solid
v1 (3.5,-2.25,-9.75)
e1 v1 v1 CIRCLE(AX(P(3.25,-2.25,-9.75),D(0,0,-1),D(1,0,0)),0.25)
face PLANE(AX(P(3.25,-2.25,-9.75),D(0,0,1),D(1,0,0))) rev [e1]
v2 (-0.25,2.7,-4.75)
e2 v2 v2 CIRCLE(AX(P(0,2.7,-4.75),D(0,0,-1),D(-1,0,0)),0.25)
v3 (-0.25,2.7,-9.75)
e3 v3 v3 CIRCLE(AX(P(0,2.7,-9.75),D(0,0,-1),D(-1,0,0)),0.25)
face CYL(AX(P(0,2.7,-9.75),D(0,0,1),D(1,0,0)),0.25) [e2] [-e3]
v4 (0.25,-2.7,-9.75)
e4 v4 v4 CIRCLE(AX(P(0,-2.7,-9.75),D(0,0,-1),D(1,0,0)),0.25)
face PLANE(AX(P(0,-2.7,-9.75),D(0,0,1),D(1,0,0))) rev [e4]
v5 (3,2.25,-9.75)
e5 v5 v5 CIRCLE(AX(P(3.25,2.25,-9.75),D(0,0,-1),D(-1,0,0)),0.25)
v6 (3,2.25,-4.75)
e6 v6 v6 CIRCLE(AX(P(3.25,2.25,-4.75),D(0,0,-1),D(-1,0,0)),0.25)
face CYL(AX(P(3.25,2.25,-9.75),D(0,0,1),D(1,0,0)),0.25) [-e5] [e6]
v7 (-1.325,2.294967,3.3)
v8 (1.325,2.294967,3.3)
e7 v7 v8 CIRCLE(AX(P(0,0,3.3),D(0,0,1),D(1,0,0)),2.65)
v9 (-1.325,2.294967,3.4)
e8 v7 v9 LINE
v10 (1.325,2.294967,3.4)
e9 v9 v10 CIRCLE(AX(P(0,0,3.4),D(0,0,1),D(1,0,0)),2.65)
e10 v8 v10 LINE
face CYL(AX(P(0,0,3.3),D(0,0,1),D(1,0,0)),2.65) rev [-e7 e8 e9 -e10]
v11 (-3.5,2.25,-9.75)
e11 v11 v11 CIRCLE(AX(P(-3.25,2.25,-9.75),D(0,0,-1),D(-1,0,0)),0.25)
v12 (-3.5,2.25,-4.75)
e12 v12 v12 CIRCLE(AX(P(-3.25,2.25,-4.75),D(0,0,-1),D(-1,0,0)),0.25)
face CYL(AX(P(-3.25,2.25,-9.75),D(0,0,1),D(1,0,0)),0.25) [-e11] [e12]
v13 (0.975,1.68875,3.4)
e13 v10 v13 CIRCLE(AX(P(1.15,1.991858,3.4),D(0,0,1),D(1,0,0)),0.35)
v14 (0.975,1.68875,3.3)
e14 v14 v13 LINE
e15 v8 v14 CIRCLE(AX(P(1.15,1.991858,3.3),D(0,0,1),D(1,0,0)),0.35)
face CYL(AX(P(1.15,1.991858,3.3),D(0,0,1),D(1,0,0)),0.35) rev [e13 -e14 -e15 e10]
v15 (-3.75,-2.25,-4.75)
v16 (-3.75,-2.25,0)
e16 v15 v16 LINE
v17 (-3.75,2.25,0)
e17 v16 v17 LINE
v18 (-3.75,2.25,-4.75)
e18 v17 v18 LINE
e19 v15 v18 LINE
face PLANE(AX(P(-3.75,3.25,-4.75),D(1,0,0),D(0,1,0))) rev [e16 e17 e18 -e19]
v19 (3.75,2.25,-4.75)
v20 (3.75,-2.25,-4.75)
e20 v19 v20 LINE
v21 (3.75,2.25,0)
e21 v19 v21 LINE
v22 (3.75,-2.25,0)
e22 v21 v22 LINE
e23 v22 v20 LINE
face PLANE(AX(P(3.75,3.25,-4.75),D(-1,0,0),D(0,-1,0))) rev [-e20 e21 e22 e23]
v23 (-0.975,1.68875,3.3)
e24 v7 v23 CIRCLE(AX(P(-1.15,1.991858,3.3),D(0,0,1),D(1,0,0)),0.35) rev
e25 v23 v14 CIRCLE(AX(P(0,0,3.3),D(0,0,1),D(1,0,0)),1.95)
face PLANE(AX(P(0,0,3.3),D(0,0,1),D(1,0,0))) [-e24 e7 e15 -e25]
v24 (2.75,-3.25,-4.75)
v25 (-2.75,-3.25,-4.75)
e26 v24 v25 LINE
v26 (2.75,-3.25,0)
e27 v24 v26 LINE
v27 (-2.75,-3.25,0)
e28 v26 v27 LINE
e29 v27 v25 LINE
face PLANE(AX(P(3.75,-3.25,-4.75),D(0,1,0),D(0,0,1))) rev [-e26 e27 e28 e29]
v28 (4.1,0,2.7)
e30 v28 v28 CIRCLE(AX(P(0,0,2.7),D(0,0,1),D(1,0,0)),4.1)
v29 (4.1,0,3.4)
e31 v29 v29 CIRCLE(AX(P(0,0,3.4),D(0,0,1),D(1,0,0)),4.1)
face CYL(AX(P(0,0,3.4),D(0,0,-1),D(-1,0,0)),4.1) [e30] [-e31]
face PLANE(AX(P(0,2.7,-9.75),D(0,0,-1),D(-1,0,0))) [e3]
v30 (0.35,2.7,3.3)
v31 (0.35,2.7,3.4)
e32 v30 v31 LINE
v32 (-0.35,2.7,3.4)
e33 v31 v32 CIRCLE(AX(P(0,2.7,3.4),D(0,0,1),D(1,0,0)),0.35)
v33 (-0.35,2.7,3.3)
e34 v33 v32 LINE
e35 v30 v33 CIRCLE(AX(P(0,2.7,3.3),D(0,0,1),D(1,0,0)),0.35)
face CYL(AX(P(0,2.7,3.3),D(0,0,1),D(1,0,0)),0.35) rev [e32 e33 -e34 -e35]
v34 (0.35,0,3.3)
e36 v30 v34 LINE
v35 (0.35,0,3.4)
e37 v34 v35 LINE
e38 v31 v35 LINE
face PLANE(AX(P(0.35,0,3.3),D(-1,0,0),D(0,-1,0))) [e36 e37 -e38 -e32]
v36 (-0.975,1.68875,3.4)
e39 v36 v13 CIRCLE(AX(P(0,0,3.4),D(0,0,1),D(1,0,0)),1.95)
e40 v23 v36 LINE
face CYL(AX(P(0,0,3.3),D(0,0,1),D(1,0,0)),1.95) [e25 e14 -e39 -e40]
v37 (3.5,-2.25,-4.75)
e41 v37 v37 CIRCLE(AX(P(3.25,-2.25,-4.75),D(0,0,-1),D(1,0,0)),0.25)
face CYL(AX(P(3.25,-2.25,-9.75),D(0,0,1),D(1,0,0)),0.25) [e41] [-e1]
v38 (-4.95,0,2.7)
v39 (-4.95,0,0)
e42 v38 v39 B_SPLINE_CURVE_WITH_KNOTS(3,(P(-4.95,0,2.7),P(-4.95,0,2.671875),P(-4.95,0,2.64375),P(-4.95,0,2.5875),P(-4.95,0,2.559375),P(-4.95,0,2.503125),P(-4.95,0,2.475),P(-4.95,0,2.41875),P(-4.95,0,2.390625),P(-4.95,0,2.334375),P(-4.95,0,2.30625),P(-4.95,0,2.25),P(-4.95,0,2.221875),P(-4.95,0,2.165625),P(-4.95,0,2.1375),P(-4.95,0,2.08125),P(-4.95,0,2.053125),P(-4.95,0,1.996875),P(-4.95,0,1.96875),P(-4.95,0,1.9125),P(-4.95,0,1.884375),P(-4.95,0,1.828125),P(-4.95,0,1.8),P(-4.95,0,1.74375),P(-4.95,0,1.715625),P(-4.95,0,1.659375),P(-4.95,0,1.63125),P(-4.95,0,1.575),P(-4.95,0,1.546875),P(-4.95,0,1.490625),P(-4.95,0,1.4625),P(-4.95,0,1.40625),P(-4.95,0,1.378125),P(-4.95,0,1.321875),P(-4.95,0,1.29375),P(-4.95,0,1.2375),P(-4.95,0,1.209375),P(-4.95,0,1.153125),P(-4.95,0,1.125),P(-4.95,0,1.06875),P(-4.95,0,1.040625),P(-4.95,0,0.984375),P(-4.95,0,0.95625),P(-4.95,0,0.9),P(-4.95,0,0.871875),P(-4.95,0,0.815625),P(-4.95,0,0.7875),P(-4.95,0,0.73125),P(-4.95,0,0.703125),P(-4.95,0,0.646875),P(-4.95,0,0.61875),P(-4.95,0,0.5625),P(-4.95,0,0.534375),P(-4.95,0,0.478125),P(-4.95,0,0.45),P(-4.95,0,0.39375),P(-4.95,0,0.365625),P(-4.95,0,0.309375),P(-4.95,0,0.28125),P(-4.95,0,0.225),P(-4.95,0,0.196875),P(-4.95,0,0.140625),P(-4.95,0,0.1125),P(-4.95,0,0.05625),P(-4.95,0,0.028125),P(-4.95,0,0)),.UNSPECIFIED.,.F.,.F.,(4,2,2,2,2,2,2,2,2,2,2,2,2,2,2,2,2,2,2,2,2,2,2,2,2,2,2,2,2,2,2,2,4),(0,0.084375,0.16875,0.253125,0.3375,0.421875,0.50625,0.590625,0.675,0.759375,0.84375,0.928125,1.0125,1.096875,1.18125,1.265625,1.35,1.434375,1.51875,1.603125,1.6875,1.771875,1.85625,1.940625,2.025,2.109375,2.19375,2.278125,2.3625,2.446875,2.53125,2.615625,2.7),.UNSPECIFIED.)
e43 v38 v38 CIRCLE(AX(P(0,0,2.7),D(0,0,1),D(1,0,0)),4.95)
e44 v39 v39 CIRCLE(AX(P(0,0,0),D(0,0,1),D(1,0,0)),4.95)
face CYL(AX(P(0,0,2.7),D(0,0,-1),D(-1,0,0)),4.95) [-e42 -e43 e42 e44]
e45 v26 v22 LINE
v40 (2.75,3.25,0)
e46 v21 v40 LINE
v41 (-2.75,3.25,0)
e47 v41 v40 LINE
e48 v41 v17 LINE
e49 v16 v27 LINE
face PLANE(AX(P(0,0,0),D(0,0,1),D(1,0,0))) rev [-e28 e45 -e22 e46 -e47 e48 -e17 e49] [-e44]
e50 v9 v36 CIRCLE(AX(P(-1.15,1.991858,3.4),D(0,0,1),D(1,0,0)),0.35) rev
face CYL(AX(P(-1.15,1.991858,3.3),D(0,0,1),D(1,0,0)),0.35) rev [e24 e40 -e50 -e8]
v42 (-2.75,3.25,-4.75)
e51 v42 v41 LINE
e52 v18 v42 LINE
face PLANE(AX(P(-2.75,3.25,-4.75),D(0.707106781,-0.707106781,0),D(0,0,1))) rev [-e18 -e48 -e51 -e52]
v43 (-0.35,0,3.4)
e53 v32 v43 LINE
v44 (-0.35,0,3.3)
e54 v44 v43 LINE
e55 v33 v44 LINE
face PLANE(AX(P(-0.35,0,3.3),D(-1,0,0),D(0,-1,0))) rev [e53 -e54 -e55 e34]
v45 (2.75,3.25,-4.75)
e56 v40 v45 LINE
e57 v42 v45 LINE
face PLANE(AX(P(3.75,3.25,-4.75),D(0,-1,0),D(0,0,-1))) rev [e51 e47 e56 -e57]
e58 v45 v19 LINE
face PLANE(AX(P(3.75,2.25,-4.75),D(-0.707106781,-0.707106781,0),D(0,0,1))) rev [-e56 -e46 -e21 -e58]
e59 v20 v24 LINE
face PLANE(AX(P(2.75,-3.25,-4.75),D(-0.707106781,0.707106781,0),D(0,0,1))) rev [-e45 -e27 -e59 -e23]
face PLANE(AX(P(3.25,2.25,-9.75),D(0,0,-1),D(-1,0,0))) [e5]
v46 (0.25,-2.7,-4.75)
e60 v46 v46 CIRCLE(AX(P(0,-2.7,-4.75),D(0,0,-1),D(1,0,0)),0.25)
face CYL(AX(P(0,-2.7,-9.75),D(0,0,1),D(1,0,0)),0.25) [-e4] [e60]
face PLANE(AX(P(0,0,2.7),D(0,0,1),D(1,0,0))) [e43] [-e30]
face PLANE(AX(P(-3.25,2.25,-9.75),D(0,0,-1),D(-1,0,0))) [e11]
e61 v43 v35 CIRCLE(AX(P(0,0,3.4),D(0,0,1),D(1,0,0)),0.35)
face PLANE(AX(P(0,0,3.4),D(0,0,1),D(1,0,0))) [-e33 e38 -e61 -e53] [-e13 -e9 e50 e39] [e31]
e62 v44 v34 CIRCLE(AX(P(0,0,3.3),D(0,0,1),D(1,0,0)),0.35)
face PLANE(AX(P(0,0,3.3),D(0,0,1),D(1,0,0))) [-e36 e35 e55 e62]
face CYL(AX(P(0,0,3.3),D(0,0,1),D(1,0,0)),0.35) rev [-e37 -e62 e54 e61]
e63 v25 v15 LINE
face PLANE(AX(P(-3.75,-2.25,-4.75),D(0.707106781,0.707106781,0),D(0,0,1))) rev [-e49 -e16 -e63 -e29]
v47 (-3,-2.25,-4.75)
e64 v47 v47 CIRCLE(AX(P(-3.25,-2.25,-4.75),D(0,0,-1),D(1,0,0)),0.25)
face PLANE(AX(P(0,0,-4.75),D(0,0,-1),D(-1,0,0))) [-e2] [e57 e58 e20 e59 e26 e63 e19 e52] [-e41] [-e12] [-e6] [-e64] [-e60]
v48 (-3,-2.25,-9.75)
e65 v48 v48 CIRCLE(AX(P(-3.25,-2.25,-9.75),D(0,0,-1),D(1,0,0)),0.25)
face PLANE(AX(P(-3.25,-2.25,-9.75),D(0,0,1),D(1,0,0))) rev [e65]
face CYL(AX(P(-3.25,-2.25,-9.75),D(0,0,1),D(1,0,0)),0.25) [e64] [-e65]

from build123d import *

# Parameters (mm, degrees)
ESQUISSE1_R             = 4.95
BOSS_EXTRU_1_DEPTH      = 2.7
ESQUISSE2_W             = 7.5
ESQUISSE2_H             = 6.5
BOSS_EXTRU_2_DEPTH      = 4.75
ESQUISSE3_R             = 4.1
BOSS_EXTRU_3_DEPTH      = 0.7
CHANFREIN1_SIZE         = 1
ESQUISSE4_R             = 0.25
BOSS_EXTRU_4_DEPTH      = 5
ENL_V_MAT_EXTRU_1_DEPTH = 0.1


with BuildPart() as part:
    # Esquisse1 → Boss.-Extru.1 (new body)
    with BuildSketch(Plane.XY):
        with Locations(Location((0, 0, 0), (0, 0, 180))):
            Circle(ESQUISSE1_R)
    extrude(amount=BOSS_EXTRU_1_DEPTH)

    # Esquisse2 → Boss.-Extru.2 (add)
    with BuildSketch(Plane(origin=(0, 0, 0), x_dir=(-1, 0, 0), z_dir=(0, 0, -1))):
        Rectangle(ESQUISSE2_W, ESQUISSE2_H)
    extrude(amount=BOSS_EXTRU_2_DEPTH)

    # Esquisse3 → Boss.-Extru.3 (add)
    with BuildSketch(Plane.XY.offset(2.7)):
        Circle(ESQUISSE3_R)
    extrude(amount=BOSS_EXTRU_3_DEPTH)

    # Chanfrein1
    # the kernel refuses this chamfer: 1 mm, written as the material it takes off along each edge
    with BuildSketch(Plane(origin=(-3.75, -3.25, 0), x_dir=(-0.027495876610586487, 0.9996219169112968, 0), z_dir=(0, 0, -1)), Plane(origin=(3.75, 3.25, 0), x_dir=(0.027495876610586487, -0.9996219169112968, 0), z_dir=(0, 0, -1)), Plane(origin=(3.75, -3.25, 0), x_dir=(-0.9996219169112968, -0.027495876610586473, 0), z_dir=(0, 0, -1))) as chanfrein1_piece_1:
        Polygon((CHANFREIN1_SIZE * 0.999621916911, CHANFREIN1_SIZE * 0.0274958766106), (-CHANFREIN1_SIZE * 0.0274958766106, CHANFREIN1_SIZE * 0.999621916911), (0, 0), align=None)
    extrude(amount=7.321682988, mode=Mode.SUBTRACT)
    with BuildSketch(Plane(origin=(-3.75, 3.25, 0), x_dir=(-0.027495876610586487, -0.9996219169112968, 0), z_dir=(0, 0, -1))) as chanfrein1_piece_2:
        Polygon((CHANFREIN1_SIZE * 0.999621916911, -CHANFREIN1_SIZE * 0.0274958766106), (-CHANFREIN1_SIZE * 0.0274958766106, -CHANFREIN1_SIZE * 0.999621916911), (0, 0), align=None)
    extrude(amount=7.321682988, mode=Mode.SUBTRACT)

    # Esquisse4 → Boss.-Extru.4 (add)
    with BuildSketch(Plane(origin=(0, 0, -4.75), x_dir=(-1, 0, 0), z_dir=(0, 0, -1))):
        with Locations((-3.25, 2.25)):
            Circle(ESQUISSE4_R)
        with Locations((0, 2.7)):
            Circle(ESQUISSE4_R)
        with Locations((3.25, 2.25)):
            Circle(ESQUISSE4_R)
        with Locations(Location((3.25, -2.25, 0), (0, 0, 180))):
            Circle(ESQUISSE4_R)
        with Locations(Location((0, -2.7, 0), (0, 0, 180))):
            Circle(ESQUISSE4_R)
        with Locations(Location((-3.25, -2.25, 0), (0, 0, 180))):
            Circle(ESQUISSE4_R)
    extrude(amount=BOSS_EXTRU_4_DEPTH)

    # Esquisse5 → Enlèv. mat.-Extru.1 (cut)
    with BuildSketch(Plane.XY.offset(3.4)):
        with BuildLine():
            Line((-0.35, 2.7), (-0.35, 0))
            ThreePointArc((-0.35, 0), (0, -0.35), (0.35, 0))
            Line((0.35, 0), (0.35, 2.7))
            ThreePointArc((0.35, 2.7), (0, 3.05), (-0.35, 2.7))
        make_face()
        with BuildLine():
            ThreePointArc((-1.325, 2.29496732), (0, -2.65), (1.325, 2.29496732))
            ThreePointArc((1.325, 2.29496732), (0.846891109, 2.166858429), (0.975, 1.688749537))
            ThreePointArc((0.975, 1.688749537), (0, -1.95), (-0.975, 1.688749537))
            ThreePointArc((-0.975, 1.688749537), (-0.846891109, 2.166858429), (-1.325, 2.29496732))
        make_face()
    extrude(amount=-ENL_V_MAT_EXTRU_1_DEPTH, mode=Mode.SUBTRACT)


solid = part.part
